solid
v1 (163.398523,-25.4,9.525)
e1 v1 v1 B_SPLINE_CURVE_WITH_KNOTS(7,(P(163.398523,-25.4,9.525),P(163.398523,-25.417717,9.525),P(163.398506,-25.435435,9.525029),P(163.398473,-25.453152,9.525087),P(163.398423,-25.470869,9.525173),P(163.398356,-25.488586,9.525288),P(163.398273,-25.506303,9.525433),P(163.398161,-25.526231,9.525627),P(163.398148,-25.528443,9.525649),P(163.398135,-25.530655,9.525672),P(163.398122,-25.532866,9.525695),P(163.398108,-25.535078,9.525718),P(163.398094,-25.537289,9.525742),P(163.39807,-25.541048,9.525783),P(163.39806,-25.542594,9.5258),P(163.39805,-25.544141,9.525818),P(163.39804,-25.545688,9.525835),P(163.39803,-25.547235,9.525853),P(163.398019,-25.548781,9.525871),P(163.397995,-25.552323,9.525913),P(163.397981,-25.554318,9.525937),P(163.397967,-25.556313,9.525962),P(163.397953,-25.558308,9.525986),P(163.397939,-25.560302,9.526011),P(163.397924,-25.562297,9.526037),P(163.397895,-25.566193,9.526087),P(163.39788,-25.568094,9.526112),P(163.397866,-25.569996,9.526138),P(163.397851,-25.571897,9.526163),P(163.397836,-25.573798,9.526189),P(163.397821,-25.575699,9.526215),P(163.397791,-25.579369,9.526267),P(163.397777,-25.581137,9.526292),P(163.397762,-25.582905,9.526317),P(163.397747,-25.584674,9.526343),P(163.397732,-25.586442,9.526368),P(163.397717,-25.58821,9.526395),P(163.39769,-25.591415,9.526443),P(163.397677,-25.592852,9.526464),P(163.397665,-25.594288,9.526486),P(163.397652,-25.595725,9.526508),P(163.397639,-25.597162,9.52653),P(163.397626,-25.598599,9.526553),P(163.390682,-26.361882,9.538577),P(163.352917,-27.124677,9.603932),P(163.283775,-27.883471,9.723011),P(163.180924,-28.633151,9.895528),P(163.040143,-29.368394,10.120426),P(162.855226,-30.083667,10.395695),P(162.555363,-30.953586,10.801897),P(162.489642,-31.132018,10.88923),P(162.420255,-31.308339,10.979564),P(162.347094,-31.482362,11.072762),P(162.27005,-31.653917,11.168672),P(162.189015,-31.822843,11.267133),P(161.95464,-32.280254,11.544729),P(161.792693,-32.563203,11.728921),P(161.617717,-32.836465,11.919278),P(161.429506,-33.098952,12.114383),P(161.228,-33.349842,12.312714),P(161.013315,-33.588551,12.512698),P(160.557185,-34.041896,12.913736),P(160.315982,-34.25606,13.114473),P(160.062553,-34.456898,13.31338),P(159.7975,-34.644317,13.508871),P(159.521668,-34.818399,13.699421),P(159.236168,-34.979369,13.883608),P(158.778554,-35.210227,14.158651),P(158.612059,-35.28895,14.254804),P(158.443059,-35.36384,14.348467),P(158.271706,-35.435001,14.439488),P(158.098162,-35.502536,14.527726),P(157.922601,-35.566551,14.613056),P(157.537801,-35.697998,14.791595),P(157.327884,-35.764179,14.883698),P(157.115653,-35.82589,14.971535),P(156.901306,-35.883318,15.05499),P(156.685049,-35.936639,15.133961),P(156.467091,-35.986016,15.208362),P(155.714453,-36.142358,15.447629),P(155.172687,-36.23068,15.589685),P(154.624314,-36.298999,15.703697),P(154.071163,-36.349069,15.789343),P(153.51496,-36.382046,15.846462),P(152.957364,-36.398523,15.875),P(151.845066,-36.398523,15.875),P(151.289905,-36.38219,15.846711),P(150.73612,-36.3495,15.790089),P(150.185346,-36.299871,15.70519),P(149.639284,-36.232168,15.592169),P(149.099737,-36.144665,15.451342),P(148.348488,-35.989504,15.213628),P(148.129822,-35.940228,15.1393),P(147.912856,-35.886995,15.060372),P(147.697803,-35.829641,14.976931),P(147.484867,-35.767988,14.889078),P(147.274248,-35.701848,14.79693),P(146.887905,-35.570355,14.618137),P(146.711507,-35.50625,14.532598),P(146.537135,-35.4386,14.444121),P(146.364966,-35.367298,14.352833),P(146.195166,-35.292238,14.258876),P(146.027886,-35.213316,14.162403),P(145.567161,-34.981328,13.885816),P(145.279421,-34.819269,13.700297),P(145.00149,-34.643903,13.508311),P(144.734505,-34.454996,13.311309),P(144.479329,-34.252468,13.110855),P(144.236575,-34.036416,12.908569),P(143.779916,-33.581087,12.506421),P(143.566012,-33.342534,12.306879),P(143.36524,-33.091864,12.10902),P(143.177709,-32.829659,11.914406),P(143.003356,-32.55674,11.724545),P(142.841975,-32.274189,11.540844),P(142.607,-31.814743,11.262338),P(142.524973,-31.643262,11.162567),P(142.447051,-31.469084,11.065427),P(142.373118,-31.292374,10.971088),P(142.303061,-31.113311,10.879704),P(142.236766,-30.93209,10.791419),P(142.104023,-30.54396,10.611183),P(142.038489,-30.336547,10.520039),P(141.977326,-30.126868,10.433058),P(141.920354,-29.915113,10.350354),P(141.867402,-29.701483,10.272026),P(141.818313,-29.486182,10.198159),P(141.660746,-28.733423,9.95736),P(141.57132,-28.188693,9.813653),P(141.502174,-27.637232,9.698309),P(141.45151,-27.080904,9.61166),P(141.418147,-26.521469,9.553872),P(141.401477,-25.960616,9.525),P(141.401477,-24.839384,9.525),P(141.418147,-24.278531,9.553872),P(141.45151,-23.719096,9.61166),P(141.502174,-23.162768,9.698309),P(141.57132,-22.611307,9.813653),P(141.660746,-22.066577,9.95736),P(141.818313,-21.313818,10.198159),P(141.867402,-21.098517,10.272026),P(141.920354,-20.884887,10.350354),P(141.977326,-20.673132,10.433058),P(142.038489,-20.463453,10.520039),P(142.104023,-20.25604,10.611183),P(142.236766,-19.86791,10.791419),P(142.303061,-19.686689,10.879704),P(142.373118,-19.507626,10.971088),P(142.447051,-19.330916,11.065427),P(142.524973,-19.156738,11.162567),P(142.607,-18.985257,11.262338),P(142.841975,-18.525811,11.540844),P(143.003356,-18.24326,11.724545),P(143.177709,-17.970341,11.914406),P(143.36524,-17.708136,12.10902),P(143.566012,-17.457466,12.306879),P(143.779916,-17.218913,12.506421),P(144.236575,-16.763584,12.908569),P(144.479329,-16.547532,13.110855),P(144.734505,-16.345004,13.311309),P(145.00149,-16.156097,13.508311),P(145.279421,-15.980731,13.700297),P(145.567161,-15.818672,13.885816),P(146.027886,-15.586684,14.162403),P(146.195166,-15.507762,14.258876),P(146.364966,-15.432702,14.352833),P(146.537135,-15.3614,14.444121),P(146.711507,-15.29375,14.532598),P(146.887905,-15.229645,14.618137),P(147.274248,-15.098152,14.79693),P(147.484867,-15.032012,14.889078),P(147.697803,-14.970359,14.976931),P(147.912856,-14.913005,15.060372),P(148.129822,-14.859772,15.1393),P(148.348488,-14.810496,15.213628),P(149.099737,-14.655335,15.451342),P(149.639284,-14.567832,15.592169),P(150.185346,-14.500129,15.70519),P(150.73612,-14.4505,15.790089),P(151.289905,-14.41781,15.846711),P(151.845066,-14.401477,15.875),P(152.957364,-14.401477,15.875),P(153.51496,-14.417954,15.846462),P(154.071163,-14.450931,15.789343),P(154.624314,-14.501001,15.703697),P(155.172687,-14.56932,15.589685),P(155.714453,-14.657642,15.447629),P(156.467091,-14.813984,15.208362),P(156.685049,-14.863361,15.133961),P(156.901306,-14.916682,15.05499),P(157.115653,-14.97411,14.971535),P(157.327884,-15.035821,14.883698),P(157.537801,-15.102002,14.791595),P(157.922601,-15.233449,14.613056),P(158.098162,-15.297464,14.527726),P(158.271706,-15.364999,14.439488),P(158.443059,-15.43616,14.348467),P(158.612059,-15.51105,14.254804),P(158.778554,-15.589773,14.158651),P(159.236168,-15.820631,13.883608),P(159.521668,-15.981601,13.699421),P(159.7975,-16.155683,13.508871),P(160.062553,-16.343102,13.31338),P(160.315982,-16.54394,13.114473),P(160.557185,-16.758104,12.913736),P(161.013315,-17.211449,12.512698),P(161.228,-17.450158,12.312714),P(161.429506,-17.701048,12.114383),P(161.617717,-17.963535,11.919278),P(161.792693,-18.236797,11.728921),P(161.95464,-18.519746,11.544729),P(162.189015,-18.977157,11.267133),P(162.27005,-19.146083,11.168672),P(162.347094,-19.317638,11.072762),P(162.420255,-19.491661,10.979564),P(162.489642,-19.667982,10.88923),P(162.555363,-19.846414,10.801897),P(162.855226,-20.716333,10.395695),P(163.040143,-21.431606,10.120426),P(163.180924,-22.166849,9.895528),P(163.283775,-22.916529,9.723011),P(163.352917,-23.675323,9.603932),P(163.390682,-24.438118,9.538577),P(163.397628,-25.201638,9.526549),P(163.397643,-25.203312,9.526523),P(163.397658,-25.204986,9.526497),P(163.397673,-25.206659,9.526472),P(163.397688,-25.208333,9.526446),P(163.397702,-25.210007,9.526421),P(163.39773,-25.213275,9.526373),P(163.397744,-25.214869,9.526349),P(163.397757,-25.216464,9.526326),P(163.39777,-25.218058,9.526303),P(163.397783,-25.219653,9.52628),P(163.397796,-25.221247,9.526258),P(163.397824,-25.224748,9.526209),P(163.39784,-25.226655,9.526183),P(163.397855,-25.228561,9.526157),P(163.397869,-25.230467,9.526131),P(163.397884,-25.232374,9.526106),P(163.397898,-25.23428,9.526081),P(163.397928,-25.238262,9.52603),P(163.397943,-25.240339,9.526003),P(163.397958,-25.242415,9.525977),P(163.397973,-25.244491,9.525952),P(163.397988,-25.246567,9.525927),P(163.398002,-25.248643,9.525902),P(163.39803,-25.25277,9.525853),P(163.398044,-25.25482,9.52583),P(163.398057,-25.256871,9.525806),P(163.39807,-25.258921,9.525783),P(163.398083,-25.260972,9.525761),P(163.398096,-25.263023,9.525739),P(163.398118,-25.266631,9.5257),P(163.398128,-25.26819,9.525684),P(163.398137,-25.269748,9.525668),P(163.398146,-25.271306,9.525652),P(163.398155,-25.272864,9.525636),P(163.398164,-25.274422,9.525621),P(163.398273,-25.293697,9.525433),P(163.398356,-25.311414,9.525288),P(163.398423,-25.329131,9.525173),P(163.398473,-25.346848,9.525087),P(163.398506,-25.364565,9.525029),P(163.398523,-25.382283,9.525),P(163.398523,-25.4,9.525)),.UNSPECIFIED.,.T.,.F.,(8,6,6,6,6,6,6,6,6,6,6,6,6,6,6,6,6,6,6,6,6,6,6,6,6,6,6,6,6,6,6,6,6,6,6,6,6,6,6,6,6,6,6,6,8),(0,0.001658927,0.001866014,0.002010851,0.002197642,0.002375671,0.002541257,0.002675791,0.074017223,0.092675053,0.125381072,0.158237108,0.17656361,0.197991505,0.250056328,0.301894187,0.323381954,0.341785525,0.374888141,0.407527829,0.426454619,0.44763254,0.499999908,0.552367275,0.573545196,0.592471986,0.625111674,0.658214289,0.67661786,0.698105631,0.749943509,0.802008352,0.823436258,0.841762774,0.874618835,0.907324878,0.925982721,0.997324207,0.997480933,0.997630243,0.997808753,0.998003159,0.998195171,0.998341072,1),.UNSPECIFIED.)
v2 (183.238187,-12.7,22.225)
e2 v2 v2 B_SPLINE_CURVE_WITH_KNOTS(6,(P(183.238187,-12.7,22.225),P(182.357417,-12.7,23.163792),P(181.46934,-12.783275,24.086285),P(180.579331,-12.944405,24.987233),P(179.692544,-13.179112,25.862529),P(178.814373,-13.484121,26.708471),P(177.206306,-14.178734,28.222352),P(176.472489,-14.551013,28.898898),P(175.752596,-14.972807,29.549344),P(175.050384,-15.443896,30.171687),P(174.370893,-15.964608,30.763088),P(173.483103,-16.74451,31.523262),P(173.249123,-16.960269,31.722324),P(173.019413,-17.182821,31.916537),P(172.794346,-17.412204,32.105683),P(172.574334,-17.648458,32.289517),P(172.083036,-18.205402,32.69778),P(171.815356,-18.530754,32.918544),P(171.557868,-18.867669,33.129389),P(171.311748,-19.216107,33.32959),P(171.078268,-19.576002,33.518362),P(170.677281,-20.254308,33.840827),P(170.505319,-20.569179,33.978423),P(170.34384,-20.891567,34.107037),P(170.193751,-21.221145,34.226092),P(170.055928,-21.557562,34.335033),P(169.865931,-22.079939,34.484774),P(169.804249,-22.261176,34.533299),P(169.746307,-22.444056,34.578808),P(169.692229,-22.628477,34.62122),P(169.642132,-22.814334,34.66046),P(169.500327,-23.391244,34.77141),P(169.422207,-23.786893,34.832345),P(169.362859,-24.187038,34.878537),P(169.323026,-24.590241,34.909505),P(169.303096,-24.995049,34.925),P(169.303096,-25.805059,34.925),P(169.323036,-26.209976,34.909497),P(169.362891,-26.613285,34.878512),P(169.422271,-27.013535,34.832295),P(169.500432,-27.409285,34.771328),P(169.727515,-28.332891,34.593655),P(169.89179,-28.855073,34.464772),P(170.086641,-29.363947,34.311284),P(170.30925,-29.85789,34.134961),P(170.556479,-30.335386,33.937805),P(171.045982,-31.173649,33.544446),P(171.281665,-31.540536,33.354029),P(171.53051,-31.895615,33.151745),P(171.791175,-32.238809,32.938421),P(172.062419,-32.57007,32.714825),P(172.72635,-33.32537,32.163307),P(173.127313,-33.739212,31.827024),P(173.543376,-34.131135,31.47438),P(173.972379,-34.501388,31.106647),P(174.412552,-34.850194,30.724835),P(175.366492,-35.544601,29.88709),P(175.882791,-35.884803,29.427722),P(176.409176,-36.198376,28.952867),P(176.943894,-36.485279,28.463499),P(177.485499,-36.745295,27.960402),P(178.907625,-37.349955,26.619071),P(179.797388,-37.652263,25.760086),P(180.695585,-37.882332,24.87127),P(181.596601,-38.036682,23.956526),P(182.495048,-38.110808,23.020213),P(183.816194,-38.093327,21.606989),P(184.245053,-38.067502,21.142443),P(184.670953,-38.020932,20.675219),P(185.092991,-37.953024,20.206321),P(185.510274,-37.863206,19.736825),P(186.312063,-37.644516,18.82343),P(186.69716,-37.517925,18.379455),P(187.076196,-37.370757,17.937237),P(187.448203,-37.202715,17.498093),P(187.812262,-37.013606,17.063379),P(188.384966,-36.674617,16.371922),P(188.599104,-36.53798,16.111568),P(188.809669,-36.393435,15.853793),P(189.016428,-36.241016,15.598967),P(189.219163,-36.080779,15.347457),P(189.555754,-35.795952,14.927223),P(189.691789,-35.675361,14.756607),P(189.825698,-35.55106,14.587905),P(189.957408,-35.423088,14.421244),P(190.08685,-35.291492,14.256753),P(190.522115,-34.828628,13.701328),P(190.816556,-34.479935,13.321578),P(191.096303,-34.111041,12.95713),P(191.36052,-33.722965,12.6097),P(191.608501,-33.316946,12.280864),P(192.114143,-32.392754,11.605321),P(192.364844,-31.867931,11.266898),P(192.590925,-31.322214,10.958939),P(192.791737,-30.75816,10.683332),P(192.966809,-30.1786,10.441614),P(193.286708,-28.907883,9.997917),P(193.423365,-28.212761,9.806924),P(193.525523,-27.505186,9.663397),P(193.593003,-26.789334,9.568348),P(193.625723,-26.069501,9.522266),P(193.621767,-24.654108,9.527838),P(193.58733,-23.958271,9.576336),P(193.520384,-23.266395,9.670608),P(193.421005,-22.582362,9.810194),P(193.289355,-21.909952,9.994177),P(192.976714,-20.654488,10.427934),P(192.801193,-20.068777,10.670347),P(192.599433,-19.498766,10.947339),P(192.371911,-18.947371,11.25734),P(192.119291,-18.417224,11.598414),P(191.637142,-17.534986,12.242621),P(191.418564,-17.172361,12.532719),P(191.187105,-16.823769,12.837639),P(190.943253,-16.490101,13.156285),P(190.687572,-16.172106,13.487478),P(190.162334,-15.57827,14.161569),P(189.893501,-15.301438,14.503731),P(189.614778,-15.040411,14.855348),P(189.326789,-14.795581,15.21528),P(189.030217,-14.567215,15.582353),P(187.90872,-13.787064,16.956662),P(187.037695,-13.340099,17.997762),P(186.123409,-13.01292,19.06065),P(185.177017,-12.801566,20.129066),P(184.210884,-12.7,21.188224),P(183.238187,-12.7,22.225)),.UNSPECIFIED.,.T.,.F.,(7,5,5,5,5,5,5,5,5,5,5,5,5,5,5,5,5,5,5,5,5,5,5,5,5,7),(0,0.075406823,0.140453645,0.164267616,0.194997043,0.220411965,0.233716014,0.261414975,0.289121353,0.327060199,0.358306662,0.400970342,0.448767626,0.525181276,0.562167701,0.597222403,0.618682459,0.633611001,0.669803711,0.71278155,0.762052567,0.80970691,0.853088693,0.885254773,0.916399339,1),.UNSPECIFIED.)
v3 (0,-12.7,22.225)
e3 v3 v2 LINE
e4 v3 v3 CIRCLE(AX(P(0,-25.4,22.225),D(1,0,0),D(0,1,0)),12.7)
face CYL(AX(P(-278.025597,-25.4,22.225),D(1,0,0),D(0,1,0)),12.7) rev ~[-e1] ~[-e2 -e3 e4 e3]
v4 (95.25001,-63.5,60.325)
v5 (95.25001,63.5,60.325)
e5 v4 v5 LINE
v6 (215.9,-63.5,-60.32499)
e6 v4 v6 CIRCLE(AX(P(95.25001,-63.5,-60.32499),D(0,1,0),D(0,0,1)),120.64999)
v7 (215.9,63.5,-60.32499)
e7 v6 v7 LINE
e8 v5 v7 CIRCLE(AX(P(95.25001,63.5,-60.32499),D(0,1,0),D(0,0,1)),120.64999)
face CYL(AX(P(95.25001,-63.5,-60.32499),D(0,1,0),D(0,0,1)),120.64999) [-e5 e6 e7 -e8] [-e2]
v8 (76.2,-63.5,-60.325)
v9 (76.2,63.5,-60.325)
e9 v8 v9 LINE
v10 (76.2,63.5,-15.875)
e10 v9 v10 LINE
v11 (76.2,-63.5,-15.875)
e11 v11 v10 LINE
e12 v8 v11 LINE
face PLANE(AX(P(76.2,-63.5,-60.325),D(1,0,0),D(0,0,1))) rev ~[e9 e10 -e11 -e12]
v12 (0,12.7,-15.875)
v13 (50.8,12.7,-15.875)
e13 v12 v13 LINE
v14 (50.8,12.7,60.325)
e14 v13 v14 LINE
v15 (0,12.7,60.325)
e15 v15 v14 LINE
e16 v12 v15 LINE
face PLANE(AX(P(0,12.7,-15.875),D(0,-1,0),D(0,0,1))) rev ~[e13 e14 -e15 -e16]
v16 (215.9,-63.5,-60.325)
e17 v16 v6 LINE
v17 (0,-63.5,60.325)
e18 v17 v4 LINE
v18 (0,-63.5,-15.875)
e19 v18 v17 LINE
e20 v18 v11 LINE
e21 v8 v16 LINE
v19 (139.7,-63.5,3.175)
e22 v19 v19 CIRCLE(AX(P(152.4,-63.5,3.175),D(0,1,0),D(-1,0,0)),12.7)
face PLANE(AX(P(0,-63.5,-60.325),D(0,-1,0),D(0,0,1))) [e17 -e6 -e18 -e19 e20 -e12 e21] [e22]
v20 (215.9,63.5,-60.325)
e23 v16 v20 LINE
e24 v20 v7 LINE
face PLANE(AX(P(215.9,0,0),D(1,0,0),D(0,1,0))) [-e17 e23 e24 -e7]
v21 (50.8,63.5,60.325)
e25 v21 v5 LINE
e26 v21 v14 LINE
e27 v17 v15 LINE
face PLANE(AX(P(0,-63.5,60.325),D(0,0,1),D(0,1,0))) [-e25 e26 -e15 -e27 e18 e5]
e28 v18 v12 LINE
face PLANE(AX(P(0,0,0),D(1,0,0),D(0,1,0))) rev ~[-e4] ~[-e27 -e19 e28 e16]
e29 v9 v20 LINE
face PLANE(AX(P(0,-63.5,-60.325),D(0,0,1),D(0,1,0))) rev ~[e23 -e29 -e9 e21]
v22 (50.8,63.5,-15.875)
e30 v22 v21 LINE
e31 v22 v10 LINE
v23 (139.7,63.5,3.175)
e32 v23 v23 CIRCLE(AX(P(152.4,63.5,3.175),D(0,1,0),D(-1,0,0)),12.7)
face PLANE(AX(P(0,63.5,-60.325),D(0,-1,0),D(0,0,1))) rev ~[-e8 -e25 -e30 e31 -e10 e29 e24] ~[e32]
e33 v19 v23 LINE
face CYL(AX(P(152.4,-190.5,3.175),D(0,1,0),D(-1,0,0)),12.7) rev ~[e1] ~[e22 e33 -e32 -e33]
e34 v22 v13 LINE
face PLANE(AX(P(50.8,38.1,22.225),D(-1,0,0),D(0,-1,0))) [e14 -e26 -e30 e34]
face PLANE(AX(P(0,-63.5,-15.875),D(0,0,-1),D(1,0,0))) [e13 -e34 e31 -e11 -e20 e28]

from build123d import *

# Parameters (mm, degrees)
F0_W     = 127
F0_H     = 120.65
F1_DEPTH = 215.9
F2_W     = 76.2
F2_H     = 44.45
F3_DEPTH = 127
F4_W     = 50.8
F4_H     = 76.2
F5_DEPTH = 50.8
F8_D     = 25.4
F8_DEPTH = 127
F8_TIP   = 7.6309298617
F9_R     = 120.64999
F10_D    = 25.4


# Not quite as in the source:
# - a fillet or chamfer is up to 0.001 mm smaller than in the source, because OpenCascade refuses the exact size


with BuildPart() as f1:
    # F0 (on Right) → F1 (new body)
    with BuildSketch(Plane.YZ):
        Rectangle(F0_W, F0_H)
    extrude(amount=F1_DEPTH)

    # F2 (on face) → F3 (cut)
    with BuildSketch(Plane.XZ.offset(63.5)):
        with Locations((38.1, -38.1)):
            Rectangle(F2_W, F2_H)
    extrude(amount=-F3_DEPTH, mode=Mode.SUBTRACT)

    # F4 (on face) → F5 (cut)
    with BuildSketch(Plane(origin=(0, 0, 0), x_dir=(0, -1, 0), z_dir=(-1, 0, 0))):
        with Locations((-38.1, 22.225)):
            Rectangle(F4_W, F4_H)
    extrude(amount=-F5_DEPTH, mode=Mode.SUBTRACT)

    # F8
    with Locations(Plane.XZ.offset(63.5)):
        with Locations((152.4, 3.175)):
            Hole(F8_D / 2, depth=F8_DEPTH)
            with Locations((0, 0, -(F8_DEPTH + F8_TIP / 2))):  # 118° drill point
                Cone(0, F8_D / 2, F8_TIP, mode=Mode.SUBTRACT)

    # F9 (radius 120.65 in the source; OpenCascade refuses exactly that, so slightly less here)
    f9_edges = [f1.edges().sort_by_distance(p)[0] for p in [
        (215.9, 0, 60.325),
    ]]
    fillet(f9_edges, radius=F9_R)

    # F10 (through all)
    with Locations(Plane(origin=(0, 0, 0), x_dir=(0, -1, 0), z_dir=(-1, 0, 0))):
        with Locations((25.4, 22.225)):
            Hole(F10_D / 2)


solid = f1.part
